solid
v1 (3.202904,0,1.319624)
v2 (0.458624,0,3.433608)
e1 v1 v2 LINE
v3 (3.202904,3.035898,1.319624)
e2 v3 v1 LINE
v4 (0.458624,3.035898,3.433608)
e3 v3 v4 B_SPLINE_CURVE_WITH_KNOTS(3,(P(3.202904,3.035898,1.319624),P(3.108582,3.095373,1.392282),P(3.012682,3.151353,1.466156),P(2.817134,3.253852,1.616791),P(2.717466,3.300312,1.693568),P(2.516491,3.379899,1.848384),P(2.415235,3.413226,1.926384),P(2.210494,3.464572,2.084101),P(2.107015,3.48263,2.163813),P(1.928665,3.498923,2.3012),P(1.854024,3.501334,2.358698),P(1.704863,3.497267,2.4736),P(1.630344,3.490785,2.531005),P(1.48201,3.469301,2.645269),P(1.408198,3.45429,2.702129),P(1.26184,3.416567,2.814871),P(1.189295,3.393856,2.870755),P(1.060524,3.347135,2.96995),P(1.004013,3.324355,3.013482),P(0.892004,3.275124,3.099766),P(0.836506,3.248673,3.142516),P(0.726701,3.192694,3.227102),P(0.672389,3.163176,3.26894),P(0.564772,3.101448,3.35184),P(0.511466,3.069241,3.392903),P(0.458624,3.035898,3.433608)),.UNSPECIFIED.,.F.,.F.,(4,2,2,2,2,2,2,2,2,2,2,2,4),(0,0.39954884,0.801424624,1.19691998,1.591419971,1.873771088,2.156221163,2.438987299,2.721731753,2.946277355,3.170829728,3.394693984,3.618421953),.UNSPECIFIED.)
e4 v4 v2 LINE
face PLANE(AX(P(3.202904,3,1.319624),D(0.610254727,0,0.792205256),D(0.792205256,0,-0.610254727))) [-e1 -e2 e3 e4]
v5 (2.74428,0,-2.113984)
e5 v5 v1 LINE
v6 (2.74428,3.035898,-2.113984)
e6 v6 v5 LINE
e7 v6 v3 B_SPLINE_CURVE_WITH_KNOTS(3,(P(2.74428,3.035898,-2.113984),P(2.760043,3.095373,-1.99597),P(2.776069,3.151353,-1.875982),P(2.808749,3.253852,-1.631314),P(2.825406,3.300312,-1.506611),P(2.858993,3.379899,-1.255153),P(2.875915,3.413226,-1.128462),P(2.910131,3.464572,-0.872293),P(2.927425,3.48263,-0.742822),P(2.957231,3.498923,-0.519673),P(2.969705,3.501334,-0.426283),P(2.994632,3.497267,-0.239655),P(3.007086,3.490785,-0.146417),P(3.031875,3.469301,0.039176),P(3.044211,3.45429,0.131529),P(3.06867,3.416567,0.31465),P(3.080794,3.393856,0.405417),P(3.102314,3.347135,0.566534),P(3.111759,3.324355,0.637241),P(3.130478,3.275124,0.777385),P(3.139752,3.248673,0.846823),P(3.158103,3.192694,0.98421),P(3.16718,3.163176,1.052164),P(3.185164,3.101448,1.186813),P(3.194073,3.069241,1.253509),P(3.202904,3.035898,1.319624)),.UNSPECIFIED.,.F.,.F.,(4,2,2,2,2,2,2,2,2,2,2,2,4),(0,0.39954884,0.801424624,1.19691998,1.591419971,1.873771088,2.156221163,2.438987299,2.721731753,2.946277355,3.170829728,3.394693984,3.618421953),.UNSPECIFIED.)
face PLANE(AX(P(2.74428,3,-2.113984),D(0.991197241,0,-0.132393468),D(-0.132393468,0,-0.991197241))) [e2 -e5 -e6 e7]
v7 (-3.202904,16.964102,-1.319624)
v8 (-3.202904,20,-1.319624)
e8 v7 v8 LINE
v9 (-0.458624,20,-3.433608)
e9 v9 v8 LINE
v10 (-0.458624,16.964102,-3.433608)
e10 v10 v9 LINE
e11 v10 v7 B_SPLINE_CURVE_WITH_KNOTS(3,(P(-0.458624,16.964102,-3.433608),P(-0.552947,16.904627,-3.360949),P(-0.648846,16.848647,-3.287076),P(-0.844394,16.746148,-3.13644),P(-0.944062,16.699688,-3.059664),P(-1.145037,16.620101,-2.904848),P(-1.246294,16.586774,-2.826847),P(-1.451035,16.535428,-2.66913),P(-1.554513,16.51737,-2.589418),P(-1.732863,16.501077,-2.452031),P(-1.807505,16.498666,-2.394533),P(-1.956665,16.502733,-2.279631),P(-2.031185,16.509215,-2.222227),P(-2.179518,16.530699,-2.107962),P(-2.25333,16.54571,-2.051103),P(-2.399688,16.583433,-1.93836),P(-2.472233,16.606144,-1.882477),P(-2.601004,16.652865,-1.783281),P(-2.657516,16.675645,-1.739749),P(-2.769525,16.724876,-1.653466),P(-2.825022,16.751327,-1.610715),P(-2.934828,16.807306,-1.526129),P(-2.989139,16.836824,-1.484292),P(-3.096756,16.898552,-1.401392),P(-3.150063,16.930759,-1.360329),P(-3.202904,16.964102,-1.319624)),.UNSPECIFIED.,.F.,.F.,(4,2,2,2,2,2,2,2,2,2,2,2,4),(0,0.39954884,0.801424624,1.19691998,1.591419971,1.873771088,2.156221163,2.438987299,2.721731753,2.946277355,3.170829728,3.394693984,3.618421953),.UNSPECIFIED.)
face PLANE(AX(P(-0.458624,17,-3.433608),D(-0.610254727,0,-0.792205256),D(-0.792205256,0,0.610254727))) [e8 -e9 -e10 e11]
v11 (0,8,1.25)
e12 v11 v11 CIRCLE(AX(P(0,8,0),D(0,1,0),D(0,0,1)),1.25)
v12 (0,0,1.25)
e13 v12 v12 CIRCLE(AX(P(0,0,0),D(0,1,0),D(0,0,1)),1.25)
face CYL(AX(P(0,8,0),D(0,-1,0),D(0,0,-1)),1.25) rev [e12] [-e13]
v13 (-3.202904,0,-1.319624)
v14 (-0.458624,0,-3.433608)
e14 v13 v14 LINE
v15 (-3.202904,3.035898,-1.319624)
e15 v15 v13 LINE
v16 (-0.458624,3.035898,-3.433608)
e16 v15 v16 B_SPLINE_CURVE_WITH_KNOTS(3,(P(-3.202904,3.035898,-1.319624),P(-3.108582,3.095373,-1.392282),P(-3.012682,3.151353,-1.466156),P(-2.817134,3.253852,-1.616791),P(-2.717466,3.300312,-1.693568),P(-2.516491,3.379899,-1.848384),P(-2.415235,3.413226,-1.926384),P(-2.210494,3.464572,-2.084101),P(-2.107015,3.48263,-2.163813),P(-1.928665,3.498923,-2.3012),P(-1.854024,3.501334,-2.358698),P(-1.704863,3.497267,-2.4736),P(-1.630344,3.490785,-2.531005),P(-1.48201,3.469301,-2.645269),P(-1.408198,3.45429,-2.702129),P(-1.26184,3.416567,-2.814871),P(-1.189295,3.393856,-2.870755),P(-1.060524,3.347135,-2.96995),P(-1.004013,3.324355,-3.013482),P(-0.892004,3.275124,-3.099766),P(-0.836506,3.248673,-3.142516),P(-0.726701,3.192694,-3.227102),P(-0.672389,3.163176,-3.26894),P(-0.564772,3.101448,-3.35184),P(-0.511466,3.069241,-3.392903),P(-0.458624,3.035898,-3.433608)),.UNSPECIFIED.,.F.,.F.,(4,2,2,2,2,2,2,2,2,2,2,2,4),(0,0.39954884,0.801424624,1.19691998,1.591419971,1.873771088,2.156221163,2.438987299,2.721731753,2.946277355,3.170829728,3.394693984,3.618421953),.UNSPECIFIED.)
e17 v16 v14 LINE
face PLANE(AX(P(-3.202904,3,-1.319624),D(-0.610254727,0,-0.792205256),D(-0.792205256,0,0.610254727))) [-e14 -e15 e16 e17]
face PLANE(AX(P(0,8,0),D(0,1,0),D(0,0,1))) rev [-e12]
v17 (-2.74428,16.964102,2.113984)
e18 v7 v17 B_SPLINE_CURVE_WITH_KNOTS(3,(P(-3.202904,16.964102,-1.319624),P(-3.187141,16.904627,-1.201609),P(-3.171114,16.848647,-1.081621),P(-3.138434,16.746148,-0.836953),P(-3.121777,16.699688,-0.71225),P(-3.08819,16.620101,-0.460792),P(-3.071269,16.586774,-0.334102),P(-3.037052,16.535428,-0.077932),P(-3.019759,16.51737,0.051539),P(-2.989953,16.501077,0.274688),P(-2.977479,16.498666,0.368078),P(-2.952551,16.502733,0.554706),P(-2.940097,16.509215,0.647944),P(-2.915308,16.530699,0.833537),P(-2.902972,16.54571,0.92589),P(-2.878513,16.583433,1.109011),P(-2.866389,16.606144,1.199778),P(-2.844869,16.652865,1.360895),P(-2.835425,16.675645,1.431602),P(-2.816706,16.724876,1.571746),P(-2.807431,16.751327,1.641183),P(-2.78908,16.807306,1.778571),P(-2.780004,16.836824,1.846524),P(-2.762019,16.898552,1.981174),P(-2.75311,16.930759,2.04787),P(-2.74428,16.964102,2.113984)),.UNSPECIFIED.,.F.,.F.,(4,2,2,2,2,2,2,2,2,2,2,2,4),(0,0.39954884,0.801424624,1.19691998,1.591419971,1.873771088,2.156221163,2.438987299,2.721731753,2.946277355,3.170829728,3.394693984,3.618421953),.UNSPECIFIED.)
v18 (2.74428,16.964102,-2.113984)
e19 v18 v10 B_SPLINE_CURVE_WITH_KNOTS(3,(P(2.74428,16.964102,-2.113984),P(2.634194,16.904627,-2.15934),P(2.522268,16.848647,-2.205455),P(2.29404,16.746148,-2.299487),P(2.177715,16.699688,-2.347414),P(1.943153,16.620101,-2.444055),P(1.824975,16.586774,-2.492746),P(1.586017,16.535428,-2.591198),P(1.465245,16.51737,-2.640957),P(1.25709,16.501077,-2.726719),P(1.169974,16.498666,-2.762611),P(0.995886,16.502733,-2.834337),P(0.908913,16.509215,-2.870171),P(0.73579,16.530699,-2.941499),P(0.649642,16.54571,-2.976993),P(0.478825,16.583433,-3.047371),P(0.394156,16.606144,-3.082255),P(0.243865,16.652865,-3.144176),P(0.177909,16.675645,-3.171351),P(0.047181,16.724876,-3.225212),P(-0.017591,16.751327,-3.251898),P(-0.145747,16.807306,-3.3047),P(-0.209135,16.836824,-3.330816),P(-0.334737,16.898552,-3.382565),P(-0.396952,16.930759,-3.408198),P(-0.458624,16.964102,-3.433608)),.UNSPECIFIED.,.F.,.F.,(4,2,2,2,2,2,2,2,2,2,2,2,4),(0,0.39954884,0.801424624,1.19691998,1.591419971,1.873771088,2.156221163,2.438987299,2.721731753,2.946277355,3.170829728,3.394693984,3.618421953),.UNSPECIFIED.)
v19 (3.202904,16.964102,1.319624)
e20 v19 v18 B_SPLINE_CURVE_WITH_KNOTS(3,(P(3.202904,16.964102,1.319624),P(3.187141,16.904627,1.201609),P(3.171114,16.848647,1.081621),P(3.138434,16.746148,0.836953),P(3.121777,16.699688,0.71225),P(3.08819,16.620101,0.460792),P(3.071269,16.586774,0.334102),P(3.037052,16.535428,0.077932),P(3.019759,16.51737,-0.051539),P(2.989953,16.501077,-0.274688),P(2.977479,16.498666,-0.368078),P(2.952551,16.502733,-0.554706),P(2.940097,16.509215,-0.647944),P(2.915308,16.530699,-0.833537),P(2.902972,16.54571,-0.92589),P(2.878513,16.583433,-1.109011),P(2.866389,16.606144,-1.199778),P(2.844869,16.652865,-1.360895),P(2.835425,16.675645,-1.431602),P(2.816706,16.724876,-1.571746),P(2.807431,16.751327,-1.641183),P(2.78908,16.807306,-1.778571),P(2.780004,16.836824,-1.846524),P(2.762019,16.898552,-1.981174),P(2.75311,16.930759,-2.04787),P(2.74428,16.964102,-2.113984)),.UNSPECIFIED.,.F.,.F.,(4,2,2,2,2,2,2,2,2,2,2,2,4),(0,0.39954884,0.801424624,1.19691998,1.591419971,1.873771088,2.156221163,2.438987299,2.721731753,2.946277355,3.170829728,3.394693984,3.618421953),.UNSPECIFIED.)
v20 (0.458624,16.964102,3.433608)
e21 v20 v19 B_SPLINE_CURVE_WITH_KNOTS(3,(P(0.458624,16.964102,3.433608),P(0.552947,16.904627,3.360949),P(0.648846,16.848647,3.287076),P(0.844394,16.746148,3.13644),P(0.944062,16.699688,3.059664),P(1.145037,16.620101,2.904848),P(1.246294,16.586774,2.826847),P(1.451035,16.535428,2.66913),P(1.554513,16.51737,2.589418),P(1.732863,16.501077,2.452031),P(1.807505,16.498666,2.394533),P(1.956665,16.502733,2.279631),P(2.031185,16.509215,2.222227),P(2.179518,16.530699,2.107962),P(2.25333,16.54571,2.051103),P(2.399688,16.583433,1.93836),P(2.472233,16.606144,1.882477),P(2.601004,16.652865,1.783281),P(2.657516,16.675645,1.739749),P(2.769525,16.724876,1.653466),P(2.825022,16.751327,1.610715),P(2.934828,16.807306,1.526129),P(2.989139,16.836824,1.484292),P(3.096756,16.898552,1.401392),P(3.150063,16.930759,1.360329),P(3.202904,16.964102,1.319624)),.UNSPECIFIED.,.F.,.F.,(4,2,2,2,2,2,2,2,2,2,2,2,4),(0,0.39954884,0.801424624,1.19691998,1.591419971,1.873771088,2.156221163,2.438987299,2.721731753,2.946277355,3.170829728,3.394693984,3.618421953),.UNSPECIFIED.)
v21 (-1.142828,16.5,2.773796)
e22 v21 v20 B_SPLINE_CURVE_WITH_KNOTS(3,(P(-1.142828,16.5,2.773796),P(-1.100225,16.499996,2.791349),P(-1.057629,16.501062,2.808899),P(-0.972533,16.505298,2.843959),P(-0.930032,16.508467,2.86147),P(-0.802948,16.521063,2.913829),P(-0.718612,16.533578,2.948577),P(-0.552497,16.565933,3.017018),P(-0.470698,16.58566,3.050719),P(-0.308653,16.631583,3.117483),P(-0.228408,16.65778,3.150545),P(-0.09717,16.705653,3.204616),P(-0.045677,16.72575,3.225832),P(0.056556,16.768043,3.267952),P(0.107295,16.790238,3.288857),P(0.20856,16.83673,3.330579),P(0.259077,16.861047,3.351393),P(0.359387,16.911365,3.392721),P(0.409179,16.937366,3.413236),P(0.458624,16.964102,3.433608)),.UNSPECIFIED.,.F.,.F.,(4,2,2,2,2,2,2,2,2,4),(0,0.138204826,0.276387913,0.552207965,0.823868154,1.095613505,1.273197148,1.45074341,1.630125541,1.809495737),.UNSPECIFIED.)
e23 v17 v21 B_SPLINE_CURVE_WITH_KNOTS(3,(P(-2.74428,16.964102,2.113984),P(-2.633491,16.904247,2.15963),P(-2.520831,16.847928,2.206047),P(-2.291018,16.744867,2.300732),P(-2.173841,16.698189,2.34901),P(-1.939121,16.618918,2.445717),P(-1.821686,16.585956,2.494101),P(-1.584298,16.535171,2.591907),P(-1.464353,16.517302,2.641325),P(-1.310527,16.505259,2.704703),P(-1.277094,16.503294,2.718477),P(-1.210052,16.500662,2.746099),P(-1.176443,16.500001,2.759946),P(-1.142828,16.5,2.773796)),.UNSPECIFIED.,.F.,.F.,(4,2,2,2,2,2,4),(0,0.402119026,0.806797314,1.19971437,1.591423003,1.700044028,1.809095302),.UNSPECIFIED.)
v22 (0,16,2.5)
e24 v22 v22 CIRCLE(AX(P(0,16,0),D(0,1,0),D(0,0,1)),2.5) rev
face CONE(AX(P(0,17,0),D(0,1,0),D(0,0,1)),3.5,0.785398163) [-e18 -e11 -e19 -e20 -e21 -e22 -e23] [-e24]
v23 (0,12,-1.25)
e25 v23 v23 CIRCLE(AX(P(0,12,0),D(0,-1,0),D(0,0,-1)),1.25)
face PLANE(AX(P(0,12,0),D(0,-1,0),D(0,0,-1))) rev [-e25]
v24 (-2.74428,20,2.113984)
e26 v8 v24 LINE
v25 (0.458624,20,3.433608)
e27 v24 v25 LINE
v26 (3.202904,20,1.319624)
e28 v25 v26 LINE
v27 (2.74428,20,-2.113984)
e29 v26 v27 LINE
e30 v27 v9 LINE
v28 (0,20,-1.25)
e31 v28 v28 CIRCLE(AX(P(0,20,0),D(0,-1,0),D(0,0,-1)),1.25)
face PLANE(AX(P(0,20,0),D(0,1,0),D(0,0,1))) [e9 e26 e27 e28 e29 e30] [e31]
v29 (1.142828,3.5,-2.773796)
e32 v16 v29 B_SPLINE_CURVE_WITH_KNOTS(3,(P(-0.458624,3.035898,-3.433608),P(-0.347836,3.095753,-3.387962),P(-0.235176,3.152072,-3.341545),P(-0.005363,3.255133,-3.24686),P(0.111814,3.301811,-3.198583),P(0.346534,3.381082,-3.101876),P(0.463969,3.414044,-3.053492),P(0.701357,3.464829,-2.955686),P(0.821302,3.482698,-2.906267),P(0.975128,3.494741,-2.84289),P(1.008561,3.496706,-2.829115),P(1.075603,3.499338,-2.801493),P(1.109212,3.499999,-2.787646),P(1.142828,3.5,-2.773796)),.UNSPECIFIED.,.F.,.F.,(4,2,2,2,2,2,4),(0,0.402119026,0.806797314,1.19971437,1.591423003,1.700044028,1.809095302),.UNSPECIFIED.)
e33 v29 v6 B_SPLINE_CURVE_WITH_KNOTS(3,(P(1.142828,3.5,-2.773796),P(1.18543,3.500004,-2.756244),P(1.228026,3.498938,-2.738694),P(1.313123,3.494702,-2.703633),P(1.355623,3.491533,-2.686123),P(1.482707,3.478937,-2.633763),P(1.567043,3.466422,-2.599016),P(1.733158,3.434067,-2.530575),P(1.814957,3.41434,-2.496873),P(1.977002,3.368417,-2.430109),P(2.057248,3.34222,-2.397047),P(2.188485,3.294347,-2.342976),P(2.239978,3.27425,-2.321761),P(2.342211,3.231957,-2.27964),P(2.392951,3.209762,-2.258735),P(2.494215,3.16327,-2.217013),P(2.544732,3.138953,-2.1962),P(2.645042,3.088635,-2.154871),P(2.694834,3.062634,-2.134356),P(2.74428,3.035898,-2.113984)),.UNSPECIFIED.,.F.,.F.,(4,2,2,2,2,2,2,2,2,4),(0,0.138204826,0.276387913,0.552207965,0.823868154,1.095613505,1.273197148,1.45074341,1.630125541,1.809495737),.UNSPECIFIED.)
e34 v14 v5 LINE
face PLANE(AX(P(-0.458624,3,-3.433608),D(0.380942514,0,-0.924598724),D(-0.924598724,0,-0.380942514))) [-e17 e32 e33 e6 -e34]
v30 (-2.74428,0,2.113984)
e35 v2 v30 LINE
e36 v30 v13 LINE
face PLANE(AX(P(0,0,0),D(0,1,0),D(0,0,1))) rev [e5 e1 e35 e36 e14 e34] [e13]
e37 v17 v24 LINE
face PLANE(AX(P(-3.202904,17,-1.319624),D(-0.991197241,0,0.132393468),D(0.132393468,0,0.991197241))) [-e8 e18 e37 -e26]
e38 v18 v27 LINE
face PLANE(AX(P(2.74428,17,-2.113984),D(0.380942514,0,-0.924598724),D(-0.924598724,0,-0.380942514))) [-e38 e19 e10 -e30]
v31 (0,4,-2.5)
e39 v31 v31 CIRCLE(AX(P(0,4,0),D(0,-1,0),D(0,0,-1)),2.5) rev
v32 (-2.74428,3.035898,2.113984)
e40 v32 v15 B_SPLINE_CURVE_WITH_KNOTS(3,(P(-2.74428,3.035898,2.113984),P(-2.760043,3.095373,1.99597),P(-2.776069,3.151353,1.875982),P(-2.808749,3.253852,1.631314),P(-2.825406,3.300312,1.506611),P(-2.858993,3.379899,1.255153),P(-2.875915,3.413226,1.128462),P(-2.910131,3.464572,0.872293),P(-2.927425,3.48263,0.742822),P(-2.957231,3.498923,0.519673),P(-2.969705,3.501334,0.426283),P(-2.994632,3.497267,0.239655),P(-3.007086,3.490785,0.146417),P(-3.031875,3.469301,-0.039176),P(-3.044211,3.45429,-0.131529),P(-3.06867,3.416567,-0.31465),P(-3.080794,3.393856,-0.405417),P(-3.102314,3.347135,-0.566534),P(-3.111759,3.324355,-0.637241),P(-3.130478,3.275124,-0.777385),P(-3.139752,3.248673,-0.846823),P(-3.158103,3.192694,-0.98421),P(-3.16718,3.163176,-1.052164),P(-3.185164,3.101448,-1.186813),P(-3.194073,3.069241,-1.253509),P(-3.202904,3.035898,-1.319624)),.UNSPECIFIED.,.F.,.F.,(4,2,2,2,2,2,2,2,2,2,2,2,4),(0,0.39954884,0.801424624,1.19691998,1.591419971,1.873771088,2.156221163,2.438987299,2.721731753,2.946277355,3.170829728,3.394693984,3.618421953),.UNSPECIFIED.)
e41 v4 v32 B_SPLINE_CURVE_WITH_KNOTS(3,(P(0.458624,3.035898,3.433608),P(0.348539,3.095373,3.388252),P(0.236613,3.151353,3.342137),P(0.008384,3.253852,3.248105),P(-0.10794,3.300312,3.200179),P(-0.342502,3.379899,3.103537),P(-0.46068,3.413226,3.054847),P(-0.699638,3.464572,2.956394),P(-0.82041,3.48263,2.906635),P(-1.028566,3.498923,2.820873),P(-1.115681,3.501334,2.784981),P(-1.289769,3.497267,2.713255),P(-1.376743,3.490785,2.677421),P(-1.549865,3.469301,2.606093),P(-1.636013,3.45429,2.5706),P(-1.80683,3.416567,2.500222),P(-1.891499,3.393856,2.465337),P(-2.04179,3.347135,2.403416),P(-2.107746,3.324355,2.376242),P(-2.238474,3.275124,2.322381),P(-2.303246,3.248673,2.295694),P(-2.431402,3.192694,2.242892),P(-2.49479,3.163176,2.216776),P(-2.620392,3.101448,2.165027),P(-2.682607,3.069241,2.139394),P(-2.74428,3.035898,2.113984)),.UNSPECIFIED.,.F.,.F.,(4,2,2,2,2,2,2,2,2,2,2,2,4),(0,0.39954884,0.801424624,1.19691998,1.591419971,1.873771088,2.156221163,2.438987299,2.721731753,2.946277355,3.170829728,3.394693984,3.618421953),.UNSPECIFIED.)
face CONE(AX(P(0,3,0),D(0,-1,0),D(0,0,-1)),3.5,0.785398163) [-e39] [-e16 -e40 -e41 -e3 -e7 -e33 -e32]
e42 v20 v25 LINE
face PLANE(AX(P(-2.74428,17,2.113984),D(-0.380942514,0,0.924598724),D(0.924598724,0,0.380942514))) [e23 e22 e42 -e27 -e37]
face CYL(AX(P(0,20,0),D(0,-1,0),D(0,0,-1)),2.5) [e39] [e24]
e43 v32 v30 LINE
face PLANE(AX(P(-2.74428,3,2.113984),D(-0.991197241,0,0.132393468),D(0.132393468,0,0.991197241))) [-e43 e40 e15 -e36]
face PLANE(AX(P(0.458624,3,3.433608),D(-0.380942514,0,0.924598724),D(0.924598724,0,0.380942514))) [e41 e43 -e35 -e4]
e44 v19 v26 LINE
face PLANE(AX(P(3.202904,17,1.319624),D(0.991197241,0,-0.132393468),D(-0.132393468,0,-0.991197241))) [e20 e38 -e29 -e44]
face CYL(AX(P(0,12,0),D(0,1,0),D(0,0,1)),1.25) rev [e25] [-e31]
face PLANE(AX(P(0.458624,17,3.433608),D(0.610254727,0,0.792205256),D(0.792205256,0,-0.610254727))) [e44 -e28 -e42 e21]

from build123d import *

# Parameters (mm, degrees)
SKETCH_1_R          = 2.5
EXTRUDE_1_DEPTH     = 20
EXTRUDE_2_DEPTH     = 3
EXTRUDE_3_DEPTH     = 3
CHAMFER_1_SIZE      = 1
SKETCH_4_R          = 1.25
CUT_EXTRUDE_1_DEPTH = 8
CUT_EXTRUDE_START   = 8
SKETCH_5_R          = 1.25
CUT_EXTRUDE_2_DEPTH = 8


with BuildPart() as part:
    # 草图1 → 凸台-拉伸1 (new body)
    with BuildSketch(Plane(origin=(0, 0, 0), x_dir=(1, 0, 0), z_dir=(0, 1, 0))):
        with Locations(Location((0, 0, 0), (0, 0, 270))):
            Circle(SKETCH_1_R)
    extrude(amount=EXTRUDE_1_DEPTH)

    # 草图2 → 凸台-拉伸2 (add)
    with BuildSketch(Plane(origin=(0, 20, 0), x_dir=(1, 0, 0), z_dir=(0, 1, 0))):
        Polygon((3.202903935, -1.319623577), (2.744279509, 2.113984385), (-0.458624426, 3.433607962), (-3.202903935, 1.319623577), (-2.744279509, -2.113984385), (0.458624426, -3.433607962), align=None)
    extrude(amount=-EXTRUDE_2_DEPTH)

    # 草图3 → 凸台-拉伸3 (add)
    with BuildSketch(Plane.XZ):
        Polygon((3.202903935, 1.319623577), (0.458624426, 3.433607962), (-2.744279509, 2.113984385), (-3.202903935, -1.319623577), (-0.458624426, -3.433607962), (2.744279509, -2.113984385), align=None)
    extrude(amount=-EXTRUDE_3_DEPTH)

    # 倒角1
    # the kernel refuses this chamfer: 1 mm, written as the material it adds along each edge
    with BuildSketch(Plane(origin=(0, 17, 0), x_dir=(0, 0, 1), z_dir=(1, 0, 0))) as chamfer_1_piece_1_section:
        Polygon((2.5, CHAMFER_1_SIZE), (2.5 + CHAMFER_1_SIZE, 0), (2.5, 0), align=None)
    chamfer_1_piece_1 = revolve(axis=Axis((0, 17, 0), (0, -1, 0)), mode=Mode.PRIVATE)
    chamfer_1_piece_1 = split(chamfer_1_piece_1, bisect_by=Plane(origin=(2.585980682, 16.482096178, -3.299128656), z_dir=(-0.9911972405355005, 0, 0.13239346794615373)), keep=Keep.TOP, mode=Mode.PRIVATE)
    chamfer_1_piece_1 = split(chamfer_1_piece_1, bisect_by=Plane(origin=(3.258731824, 16.482096178, 1.276618014), z_dir=(-0.61025472680424, 0, -0.7922052564917015)), keep=Keep.TOP, mode=Mode.PRIVATE)
    chamfer_1_piece_1 = split(chamfer_1_piece_1, bisect_by=Plane(origin=(0.102470937, 16.482096178, -3.202431915), z_dir=(-0.3809425137312606, 0, 0.924598724437855)), keep=Keep.TOP, mode=Mode.PRIVATE)
    chamfer_1_piece_1 = split(chamfer_1_piece_1, bisect_by=Plane(origin=(-2.183184145, 16.482096178, 2.345160432), z_dir=(0.38094251373126053, 0, -0.924598724437855)), keep=Keep.TOP, mode=Mode.PRIVATE)
    chamfer_1_piece_1 = split(chamfer_1_piece_1, bisect_by=Plane(origin=(-0.402796537, 16.482096178, -3.476613525), z_dir=(0.6102547268042401, 0, 0.7922052564917015)), keep=Keep.TOP, mode=Mode.PRIVATE)
    chamfer_1_piece_1 = split(chamfer_1_piece_1, bisect_by=Plane(origin=(-3.361202761, 16.482096178, -2.504767848), z_dir=(0.9911972405355005, 0, -0.1323934679461537)), keep=Keep.TOP, mode=Mode.PRIVATE)
    add(chamfer_1_piece_1)
    with BuildSketch(Plane(origin=(0, 3, 0), x_dir=(0, 0, 1), z_dir=(1, 0, 0))) as chamfer_1_piece_2_section:
        Polygon((2.5 + CHAMFER_1_SIZE, 0), (2.5, -CHAMFER_1_SIZE), (2.5, 0), align=None)
    chamfer_1_piece_2 = revolve(axis=Axis((0, 3, 0), (0, -1, 0)), mode=Mode.PRIVATE)
    chamfer_1_piece_2 = split(chamfer_1_piece_2, bisect_by=Plane(origin=(3.258731824, 3.517903822, 1.276618014), z_dir=(-0.61025472680424, 0, -0.7922052564917015)), keep=Keep.TOP, mode=Mode.PRIVATE)
    chamfer_1_piece_2 = split(chamfer_1_piece_2, bisect_by=Plane(origin=(2.585980682, 3.517903822, -3.299128656), z_dir=(-0.9911972405355005, 0, 0.13239346794615373)), keep=Keep.TOP, mode=Mode.PRIVATE)
    chamfer_1_piece_2 = split(chamfer_1_piece_2, bisect_by=Plane(origin=(-2.183184145, 3.517903822, 2.345160432), z_dir=(0.38094251373126053, 0, -0.924598724437855)), keep=Keep.TOP, mode=Mode.PRIVATE)
    chamfer_1_piece_2 = split(chamfer_1_piece_2, bisect_by=Plane(origin=(0.102470937, 3.517903822, -3.202431915), z_dir=(-0.3809425137312606, 0, 0.924598724437855)), keep=Keep.TOP, mode=Mode.PRIVATE)
    chamfer_1_piece_2 = split(chamfer_1_piece_2, bisect_by=Plane(origin=(-3.361202761, 3.517903822, -2.504767848), z_dir=(0.9911972405355005, 0, -0.1323934679461537)), keep=Keep.TOP, mode=Mode.PRIVATE)
    chamfer_1_piece_2 = split(chamfer_1_piece_2, bisect_by=Plane(origin=(-0.402796537, 3.517903822, -3.476613525), z_dir=(0.6102547268042401, 0, 0.7922052564917015)), keep=Keep.TOP, mode=Mode.PRIVATE)
    add(chamfer_1_piece_2)

    # 草图4 → 切除-拉伸1 (cut)
    with BuildSketch(Plane(origin=(0, 0, 0), x_dir=(-1, 0, 0), z_dir=(0, 1, 0))):
        with Locations(Location((0, 0, 0), (0, 0, 90))):
            Circle(SKETCH_4_R)
    extrude(amount=CUT_EXTRUDE_1_DEPTH, mode=Mode.SUBTRACT)

    # 草图5 → 切除-拉伸2 (cut)
    with BuildSketch(Plane(origin=(0, 20, 0), x_dir=(-1, 0, 0), z_dir=(0, -1, 0)).offset(CUT_EXTRUDE_START)):
        with Locations(Location((0, 0, 0), (0, 0, 270))):
            Circle(SKETCH_5_R)
    extrude(amount=-CUT_EXTRUDE_2_DEPTH, mode=Mode.SUBTRACT)


solid = part.part
